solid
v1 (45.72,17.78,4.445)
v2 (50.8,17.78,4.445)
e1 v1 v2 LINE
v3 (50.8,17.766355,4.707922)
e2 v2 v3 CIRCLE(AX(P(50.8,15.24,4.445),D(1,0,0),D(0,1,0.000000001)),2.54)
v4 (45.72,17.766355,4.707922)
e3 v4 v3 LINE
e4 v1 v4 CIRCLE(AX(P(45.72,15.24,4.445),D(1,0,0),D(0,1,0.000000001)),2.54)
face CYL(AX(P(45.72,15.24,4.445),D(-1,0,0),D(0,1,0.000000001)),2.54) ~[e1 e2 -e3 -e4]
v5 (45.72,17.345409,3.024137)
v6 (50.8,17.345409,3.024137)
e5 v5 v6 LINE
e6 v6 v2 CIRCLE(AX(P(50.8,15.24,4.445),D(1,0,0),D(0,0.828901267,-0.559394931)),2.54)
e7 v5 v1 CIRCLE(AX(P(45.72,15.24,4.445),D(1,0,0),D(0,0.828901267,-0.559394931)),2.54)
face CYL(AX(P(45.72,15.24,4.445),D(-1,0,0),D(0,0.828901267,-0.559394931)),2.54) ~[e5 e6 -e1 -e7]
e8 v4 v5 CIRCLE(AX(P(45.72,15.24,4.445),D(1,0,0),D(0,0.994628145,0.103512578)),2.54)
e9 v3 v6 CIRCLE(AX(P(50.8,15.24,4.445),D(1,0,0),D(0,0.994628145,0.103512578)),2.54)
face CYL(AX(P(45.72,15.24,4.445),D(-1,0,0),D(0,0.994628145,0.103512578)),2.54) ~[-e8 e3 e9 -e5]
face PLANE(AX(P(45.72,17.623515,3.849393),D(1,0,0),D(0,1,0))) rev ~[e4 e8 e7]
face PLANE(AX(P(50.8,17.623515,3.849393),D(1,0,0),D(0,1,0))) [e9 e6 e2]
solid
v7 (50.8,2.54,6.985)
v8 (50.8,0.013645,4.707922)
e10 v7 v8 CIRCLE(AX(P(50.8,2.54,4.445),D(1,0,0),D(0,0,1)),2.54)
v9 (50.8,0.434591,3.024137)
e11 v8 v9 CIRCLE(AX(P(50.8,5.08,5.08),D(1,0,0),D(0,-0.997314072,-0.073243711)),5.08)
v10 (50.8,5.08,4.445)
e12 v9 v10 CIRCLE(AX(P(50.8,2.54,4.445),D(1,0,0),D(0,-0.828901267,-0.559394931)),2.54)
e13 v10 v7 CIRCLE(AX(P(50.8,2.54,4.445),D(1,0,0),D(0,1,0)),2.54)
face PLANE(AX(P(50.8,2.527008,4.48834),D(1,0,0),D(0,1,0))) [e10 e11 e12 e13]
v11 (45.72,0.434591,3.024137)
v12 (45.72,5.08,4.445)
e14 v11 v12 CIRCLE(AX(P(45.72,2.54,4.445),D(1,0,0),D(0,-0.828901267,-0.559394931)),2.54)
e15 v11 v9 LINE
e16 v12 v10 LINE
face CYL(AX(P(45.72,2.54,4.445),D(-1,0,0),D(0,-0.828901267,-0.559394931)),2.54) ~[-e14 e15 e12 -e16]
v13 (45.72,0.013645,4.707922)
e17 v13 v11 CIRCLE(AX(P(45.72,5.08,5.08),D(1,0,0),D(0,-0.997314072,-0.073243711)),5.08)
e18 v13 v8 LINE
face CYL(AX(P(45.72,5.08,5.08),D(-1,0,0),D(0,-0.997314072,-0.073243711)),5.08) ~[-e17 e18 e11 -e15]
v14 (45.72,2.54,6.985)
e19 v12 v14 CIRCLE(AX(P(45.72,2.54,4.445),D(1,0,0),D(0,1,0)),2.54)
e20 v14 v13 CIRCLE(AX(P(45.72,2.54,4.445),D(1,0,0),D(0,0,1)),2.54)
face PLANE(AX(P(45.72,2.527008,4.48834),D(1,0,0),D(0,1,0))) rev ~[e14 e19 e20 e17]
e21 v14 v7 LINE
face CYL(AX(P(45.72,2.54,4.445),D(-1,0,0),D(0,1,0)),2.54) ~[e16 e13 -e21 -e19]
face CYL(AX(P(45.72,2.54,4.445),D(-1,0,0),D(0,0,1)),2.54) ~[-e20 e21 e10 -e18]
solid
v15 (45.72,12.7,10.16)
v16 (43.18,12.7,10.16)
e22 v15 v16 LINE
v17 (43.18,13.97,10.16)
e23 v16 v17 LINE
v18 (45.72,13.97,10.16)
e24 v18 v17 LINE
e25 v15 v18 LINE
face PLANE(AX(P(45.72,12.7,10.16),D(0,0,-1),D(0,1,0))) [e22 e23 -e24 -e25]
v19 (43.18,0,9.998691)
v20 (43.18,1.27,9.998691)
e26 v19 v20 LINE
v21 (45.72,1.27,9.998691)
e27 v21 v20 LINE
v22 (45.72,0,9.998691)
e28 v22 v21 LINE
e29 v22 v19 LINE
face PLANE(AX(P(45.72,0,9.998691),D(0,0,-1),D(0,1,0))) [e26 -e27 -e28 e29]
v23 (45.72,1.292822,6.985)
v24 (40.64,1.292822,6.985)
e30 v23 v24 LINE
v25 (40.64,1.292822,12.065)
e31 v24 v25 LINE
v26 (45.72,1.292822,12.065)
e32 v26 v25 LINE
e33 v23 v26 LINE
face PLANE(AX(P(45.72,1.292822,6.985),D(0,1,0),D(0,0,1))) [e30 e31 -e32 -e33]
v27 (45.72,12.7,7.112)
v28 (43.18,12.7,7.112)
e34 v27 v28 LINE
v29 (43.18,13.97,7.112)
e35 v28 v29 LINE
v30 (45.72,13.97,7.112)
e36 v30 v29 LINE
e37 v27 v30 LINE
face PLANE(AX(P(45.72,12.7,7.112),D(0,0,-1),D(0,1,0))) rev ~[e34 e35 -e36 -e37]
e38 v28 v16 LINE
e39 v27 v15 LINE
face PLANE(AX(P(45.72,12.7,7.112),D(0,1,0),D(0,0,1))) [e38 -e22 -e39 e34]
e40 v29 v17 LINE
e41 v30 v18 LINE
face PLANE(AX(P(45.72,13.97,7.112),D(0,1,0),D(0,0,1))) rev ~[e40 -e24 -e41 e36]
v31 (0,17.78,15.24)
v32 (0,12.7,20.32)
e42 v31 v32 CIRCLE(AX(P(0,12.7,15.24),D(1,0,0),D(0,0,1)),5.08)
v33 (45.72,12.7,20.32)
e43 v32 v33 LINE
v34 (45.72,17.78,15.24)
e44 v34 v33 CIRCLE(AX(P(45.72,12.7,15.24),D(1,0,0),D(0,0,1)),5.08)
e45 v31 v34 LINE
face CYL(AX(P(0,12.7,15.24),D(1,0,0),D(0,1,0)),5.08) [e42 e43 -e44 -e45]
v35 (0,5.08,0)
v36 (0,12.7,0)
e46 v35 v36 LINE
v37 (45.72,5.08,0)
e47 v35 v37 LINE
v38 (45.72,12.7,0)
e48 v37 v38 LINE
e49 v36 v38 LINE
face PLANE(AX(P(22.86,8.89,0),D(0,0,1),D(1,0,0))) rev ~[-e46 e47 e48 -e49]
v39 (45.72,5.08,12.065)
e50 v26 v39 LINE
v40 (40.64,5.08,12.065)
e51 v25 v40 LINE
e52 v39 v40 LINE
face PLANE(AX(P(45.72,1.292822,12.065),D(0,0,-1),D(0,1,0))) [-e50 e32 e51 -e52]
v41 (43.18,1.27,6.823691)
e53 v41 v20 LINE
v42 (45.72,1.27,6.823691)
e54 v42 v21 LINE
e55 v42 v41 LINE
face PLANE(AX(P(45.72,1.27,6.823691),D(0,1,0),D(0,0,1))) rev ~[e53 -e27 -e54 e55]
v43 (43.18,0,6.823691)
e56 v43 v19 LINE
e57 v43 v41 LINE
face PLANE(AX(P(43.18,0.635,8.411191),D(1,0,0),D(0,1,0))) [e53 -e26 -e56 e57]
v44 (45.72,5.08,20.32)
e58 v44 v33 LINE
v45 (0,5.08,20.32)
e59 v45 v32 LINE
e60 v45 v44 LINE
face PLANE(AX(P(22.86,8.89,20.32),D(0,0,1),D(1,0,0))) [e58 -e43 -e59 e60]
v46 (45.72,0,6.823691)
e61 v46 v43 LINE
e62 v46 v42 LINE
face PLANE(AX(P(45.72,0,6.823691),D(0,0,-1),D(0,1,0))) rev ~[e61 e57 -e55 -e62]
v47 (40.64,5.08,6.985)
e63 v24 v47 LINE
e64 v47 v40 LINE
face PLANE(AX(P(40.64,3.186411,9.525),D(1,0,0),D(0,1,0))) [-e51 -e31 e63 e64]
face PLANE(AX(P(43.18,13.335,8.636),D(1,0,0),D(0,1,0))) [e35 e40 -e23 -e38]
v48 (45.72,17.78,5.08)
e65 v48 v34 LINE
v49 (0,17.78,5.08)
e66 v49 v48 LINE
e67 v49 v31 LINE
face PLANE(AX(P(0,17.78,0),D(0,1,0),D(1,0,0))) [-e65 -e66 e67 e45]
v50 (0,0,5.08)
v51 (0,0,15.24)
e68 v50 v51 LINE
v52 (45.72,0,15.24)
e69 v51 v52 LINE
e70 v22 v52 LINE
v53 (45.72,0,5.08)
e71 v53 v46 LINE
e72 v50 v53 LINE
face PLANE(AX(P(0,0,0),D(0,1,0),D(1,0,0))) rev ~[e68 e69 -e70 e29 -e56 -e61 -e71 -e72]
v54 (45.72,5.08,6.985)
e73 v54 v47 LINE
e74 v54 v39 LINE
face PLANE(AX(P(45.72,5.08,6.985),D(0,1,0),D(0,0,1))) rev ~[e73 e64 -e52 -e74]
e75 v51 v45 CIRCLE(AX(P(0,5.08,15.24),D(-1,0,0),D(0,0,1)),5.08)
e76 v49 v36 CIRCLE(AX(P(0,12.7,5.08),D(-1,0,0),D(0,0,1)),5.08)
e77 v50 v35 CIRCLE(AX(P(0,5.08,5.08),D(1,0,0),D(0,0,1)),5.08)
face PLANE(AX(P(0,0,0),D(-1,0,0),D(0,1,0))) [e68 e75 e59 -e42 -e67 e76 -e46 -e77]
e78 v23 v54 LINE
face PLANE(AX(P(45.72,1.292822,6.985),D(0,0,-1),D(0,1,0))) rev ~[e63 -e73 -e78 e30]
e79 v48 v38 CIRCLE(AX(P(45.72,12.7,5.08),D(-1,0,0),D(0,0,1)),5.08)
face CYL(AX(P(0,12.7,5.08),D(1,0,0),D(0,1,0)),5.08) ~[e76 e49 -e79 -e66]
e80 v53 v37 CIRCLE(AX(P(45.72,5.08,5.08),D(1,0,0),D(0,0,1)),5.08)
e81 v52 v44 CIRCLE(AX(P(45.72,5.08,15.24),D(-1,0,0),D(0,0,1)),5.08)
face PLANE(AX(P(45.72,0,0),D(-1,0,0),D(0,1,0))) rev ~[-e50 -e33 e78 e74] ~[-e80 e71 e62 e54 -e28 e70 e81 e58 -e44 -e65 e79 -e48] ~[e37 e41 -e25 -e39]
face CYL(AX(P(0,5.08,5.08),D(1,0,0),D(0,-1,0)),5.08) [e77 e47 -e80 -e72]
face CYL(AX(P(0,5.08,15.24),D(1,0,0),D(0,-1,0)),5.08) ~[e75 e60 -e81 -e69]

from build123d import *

# Parameters (mm, degrees)
F0_W      = 45.72
F0_H      = 17.78
F1_DEPTH  = 20.32
F2_R      = 5.08
F3_W      = 3.7871776995
F3_H      = 5.08
F3_W_2    = 3.7677848834
F4_DEPTH  = 5.08
F9_W      = 1.27
F9_H      = 3.175
F9_H_2    = 3.048
F10_DEPTH = 2.54
F12_DEPTH = 5.08


# Not quite as in the source:
# - the program builds the solid bodies; features that only make, move or delete a surface that nothing else refers to are left out


with BuildPart() as f1:
    # F0 (on Top) → F1 (new body)
    with BuildSketch(Plane.XY):
        with Locations((22.86, 8.89)):
            Rectangle(F0_W, F0_H)
    extrude(amount=F1_DEPTH)

    # F2
    f2_edges = [f1.edges().sort_by_distance(p)[0] for p in [
        (22.86, 17.78, 20.32),
        (22.86, 0, 20.32),
        (22.86, 17.78, 0),
        (22.86, 0, 0),
    ]]
    fillet(f2_edges, radius=F2_R)

    # F3 (on face) → F4 (cut)
    with BuildSketch(Plane.YZ.offset(45.72)):
        with Locations((3.1864111502, 9.525)):
            Rectangle(F3_W, F3_H)
        with Locations((22.2461075583, 9.525)):
            Rectangle(F3_W_2, F3_H)
    extrude(amount=-F4_DEPTH, mode=Mode.SUBTRACT)

    # F9 (on face) → F10 (cut)
    with BuildSketch(Plane.YZ.offset(45.72)):
        with Locations((0.635, 8.4111910738)):
            Rectangle(F9_W, F9_H)
        with Locations((13.335, 8.636)):
            Rectangle(F9_W, F9_H_2)
    extrude(amount=-F10_DEPTH, mode=Mode.SUBTRACT)


with BuildPart() as f12:
    # F11 (on face) → F12 (new body)
    with BuildSketch(Plane.YZ.offset(45.72)):
        with BuildLine():
            ThreePointArc((0.4345907815, 3.0241368741), (3.2829201118, 2.0160764303), (5.08, 4.445))
            ThreePointArc((5.08, 4.445), (4.3360512242, 6.2410512242), (2.54, 6.985))
            ThreePointArc((2.54, 6.985), (0.839444466, 6.3317196071), (0.0136445126, 4.7079219494))
            ThreePointArc((0.0136445126, 4.7079219494), (0.1516760993, 3.8479190248), (0.4345907815, 3.0241368741))
        make_face()
    extrude(amount=F12_DEPTH)


with BuildPart() as f12b:
    # F11 (on face) → F12, piece 2 (new body)
    with BuildSketch(Plane.YZ.offset(45.72)):
        with BuildLine():
            ThreePointArc((17.7663554874, 4.7079219494), (17.6283239007, 3.8479190248), (17.3454092185, 3.0241368741))
            ThreePointArc((17.3454092185, 3.0241368741), (17.6689235697, 3.7020798882), (17.78, 4.445))
            ThreePointArc((17.78, 4.445), (17.7765865782, 4.5766378785), (17.7663554874, 4.7079219494))
        make_face()
        with BuildLine():
            ThreePointArc((17.7663554874, 4.7079219494), (12.7758380496, 5.0610404876), (17.3454092185, 3.0241368741))
            ThreePointArc((17.3454092185, 3.0241368741), (17.6283239007, 3.8479190248), (17.7663554874, 4.7079219494))
        make_face()
    extrude(amount=F12_DEPTH)


solid = Compound([f1.part, f12.part, f12b.part])
